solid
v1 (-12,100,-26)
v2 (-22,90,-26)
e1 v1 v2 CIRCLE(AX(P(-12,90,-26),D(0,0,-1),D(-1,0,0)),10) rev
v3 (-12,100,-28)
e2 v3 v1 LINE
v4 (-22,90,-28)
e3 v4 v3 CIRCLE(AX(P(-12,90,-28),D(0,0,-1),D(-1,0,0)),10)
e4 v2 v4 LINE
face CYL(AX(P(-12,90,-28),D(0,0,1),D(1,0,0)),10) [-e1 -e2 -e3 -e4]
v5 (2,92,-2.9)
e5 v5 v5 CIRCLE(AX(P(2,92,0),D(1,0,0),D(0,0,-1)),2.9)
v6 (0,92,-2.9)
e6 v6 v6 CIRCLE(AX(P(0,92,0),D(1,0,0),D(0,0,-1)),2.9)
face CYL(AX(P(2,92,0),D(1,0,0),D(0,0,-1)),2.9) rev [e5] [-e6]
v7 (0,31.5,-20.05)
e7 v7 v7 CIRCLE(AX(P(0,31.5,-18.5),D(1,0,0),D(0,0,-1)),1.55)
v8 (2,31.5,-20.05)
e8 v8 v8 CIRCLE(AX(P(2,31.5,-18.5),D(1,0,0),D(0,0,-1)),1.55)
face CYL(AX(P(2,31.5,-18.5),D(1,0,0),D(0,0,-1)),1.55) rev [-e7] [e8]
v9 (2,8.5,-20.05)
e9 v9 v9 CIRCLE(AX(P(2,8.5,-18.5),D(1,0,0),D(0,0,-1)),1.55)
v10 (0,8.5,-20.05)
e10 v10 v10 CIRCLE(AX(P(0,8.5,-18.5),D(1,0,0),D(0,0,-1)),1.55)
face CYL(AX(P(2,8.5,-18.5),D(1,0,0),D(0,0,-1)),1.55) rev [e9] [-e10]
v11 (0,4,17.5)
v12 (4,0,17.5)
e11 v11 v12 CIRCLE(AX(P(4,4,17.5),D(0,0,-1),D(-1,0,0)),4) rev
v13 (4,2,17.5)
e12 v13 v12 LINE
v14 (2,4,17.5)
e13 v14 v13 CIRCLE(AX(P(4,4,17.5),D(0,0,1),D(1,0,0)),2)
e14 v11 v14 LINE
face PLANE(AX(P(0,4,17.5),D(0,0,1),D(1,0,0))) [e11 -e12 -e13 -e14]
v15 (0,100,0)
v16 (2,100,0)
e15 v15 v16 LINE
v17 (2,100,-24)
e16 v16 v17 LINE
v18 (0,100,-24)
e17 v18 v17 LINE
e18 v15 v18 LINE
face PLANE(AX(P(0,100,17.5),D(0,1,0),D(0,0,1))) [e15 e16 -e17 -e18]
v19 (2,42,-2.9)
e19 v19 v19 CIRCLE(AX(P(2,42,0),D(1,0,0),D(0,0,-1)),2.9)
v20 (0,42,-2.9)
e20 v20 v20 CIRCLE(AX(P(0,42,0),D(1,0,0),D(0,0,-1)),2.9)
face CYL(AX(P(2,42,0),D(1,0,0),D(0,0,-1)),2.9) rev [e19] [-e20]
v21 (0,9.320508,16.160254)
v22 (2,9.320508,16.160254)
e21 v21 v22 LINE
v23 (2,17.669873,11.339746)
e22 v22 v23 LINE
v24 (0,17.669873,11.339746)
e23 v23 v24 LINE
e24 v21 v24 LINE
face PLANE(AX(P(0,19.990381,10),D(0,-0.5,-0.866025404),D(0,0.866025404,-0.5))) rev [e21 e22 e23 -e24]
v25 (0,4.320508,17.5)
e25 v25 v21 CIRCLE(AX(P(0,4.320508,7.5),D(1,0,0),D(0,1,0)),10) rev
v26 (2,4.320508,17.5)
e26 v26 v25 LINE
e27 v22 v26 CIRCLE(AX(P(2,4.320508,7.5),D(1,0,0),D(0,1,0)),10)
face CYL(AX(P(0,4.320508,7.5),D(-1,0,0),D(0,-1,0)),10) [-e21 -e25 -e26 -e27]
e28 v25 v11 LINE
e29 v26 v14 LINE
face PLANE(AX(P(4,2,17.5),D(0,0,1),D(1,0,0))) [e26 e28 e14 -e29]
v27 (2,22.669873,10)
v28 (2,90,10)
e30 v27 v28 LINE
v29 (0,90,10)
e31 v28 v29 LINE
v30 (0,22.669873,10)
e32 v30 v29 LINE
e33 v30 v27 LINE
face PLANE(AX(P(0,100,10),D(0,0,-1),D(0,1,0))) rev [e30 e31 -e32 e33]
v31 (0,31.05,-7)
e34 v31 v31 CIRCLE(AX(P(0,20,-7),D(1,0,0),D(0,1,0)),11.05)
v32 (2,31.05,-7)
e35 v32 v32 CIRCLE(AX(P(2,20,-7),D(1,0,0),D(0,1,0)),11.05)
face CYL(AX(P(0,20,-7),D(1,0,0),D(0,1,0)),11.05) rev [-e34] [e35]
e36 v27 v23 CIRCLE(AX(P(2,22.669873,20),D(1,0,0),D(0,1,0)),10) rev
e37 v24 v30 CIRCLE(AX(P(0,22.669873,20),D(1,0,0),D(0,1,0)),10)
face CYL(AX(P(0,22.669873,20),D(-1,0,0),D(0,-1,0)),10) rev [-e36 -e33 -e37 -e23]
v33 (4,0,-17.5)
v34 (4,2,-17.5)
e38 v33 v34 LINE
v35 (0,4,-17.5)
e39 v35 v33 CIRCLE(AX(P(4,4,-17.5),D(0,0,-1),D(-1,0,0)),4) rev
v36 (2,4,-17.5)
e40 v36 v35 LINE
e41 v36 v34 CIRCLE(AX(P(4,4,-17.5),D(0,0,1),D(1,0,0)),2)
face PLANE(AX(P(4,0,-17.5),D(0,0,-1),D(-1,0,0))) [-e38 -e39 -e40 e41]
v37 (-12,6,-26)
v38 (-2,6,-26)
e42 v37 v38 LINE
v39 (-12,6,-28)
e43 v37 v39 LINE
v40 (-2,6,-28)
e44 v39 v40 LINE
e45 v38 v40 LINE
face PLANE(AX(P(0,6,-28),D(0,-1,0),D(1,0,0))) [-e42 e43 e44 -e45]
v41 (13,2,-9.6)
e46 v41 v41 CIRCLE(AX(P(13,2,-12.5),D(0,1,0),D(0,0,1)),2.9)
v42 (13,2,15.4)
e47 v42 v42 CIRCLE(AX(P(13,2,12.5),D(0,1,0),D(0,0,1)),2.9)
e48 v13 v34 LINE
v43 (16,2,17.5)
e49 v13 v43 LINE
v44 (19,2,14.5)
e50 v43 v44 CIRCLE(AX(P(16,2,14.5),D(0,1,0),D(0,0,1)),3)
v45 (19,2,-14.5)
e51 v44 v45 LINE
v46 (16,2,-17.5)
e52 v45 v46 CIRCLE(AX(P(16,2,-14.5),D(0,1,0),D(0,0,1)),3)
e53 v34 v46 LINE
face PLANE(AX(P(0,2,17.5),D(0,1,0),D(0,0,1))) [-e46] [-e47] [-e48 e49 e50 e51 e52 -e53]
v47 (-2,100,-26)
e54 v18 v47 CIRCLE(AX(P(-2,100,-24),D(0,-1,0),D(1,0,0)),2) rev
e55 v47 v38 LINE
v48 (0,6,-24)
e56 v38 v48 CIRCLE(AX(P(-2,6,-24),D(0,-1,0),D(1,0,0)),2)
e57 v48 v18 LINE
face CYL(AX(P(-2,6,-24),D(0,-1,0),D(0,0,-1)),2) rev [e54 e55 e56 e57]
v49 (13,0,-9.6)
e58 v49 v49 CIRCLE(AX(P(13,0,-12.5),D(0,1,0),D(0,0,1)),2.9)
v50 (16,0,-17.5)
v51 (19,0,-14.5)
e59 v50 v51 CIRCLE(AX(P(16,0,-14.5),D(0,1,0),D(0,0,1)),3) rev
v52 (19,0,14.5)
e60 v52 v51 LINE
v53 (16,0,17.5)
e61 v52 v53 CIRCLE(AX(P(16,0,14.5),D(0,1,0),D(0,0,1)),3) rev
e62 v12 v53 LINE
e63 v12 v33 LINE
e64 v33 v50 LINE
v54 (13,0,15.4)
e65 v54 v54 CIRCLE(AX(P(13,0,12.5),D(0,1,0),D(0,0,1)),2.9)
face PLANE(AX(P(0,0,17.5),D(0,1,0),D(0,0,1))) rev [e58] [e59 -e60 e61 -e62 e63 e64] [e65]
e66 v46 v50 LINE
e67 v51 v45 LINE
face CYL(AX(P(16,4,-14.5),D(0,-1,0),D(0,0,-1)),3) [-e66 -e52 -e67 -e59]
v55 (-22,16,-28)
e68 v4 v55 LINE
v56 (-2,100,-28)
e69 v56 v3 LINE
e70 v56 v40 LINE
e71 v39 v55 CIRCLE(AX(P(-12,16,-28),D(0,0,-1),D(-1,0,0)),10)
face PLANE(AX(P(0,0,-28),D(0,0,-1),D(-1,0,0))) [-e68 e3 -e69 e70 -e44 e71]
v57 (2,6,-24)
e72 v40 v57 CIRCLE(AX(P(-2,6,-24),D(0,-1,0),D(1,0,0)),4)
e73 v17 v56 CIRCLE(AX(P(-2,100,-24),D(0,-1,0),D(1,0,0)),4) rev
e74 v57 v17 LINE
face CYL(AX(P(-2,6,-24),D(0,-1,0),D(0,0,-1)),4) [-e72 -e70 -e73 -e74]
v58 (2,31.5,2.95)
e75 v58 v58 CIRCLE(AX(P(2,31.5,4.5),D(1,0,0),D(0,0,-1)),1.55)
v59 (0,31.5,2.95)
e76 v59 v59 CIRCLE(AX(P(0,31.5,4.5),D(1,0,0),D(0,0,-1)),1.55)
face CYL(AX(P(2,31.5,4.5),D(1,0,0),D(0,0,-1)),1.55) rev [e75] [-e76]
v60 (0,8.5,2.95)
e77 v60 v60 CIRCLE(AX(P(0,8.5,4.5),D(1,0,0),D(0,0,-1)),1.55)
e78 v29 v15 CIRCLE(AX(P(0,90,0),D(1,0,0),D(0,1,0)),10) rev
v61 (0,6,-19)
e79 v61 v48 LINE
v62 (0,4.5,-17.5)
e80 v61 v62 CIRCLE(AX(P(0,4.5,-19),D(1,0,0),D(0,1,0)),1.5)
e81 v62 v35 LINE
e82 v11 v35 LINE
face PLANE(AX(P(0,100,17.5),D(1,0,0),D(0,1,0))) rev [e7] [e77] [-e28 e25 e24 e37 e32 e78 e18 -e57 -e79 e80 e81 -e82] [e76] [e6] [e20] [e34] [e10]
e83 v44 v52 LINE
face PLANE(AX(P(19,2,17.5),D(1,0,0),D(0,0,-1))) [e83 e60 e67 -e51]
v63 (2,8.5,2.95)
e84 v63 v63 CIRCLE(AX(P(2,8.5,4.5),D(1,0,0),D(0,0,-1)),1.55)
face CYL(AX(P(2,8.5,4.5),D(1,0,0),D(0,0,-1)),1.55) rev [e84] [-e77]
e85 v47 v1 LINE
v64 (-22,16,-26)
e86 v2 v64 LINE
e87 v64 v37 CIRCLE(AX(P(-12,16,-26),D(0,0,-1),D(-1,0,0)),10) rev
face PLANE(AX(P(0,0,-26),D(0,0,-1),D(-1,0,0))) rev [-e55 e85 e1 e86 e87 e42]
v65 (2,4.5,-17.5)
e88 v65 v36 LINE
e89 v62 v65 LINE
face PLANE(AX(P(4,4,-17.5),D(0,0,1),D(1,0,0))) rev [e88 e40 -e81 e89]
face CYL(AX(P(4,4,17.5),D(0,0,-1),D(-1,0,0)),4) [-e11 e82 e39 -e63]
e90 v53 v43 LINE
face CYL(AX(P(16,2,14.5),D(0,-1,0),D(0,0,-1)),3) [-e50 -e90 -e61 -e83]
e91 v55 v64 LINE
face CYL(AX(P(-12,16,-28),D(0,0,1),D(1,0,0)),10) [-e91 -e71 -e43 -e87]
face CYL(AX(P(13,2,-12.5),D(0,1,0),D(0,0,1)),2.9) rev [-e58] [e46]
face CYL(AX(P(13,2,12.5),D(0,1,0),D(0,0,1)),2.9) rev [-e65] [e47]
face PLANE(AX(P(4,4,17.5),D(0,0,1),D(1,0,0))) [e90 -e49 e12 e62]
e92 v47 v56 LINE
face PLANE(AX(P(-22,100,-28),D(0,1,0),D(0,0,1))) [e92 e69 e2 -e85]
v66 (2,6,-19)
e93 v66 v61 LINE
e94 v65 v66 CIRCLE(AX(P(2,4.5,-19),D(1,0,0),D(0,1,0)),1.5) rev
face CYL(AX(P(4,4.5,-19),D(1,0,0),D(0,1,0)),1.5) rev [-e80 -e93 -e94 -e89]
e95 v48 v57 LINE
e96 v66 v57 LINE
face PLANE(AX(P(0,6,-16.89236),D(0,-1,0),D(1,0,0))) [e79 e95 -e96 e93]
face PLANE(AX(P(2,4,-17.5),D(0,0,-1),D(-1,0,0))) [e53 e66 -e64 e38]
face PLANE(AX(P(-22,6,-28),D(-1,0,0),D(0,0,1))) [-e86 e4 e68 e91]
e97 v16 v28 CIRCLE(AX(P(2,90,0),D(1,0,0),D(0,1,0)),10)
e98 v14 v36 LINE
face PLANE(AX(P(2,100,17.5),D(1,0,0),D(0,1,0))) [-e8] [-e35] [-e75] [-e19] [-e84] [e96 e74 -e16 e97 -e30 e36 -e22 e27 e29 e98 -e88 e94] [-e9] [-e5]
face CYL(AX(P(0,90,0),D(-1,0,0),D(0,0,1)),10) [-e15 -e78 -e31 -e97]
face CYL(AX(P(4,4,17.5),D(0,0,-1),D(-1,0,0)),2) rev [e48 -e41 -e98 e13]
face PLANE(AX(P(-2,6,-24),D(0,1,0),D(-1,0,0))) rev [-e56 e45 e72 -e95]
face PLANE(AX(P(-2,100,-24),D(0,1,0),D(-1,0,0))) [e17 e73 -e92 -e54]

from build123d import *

# Parameters (mm, degrees)
BASE_FLANGE1_DEPTH     = 17.5
M5_CLEARANCE_HOLE2_D   = 5.8
M5_CLEARANCE_HOLE1_D   = 5.8
BOSS_EXTRUDE1_DEPTH    = 2
M2_5_CLEARANCE_HOLE1_D = 3.1
SKETCH13_R             = 11.05
CUT_EXTRUDE2_DEPTH     = 10
SKETCH16_W             = 3.5
SKETCH16_H             = 66
BOSS_EXTRUDE2_DEPTH    = 2
EDGE_FLANGE1_DEPTH     = 94
CUT_EXTRUDE3_DEPTH     = 2
FILLET1_R              = 10
FILLET2_R              = 3
FILLET3_R              = 1.5


# Sheet-metal steps are written as plain solids
with BuildPart() as part:
    # Sketch1 → Base-Flange1 (new, symmetric)
    with BuildSketch(Plane.XY):
        with BuildLine():
            Line((0, 100), (0, 4))
            ThreePointArc((0, 4), (1.171572875, 1.171572875), (4, 0))
            Line((4, 0), (19, 0))
            Line((19, 0), (19, 2))
            Line((19, 2), (4, 2))
            ThreePointArc((4, 2), (2.585786438, 2.585786438), (2, 4))
            Line((2, 4), (2, 100))
            Line((2, 100), (0, 100))
        make_face()
    extrude(amount=BASE_FLANGE1_DEPTH, both=True)

    # M5 Clearance Hole2 (through all)
    with Locations(Plane(origin=(0, 2, 0), x_dir=(1, 0, 0), z_dir=(0, 1, 0))):
        with Locations((13, -12.5), (13, 12.5)):
            Hole(M5_CLEARANCE_HOLE2_D / 2)

    # M5 Clearance Hole1 (through all)
    with Locations(Plane(origin=(2, 0, 0), x_dir=(0, 0, -1), z_dir=(1, 0, 0))):
        with Locations((0, 92), (0, 42)):
            Hole(M5_CLEARANCE_HOLE1_D / 2)

    # Sketch12 → Boss-Extrude1 (add)
    with BuildSketch(Plane(origin=(2, 0, 0), x_dir=(0, 0, -1), z_dir=(1, 0, 0))):
        Polygon((16.892359744, 6), (21, 6), (21, 34), (14.5, 34), align=None)
    extrude(amount=-BOSS_EXTRUDE1_DEPTH)

    # M2.5 Clearance Hole1 (through all)
    with Locations(Plane(origin=(2, 0, 0), x_dir=(0, 0, -1), z_dir=(1, 0, 0))):
        with Locations((18.5, 8.5), (-4.5, 8.5), (-4.5, 31.5), (18.5, 31.5)):
            Hole(M2_5_CLEARANCE_HOLE1_D / 2)

    # Sketch13 → Cut-Extrude2 (cut)
    with BuildSketch(Plane(origin=(2, 0, 0), x_dir=(0, 0, -1), z_dir=(1, 0, 0))):
        with Locations(Location((7, 20, 0), (0, 0, 90))):
            Circle(SKETCH13_R)
    extrude(amount=-CUT_EXTRUDE2_DEPTH, mode=Mode.SUBTRACT)

    # Sketch16 → Boss-Extrude2 (add)
    with BuildSketch(Plane(origin=(2, 0, 0), x_dir=(0, 0, -1), z_dir=(1, 0, 0))):
        with Locations((19.25, 67)):
            Rectangle(SKETCH16_W, SKETCH16_H)
    extrude(amount=-BOSS_EXTRUDE2_DEPTH)

    # Edge-Flange1 section (across the edge) → Edge-Flange1 (add)
    with BuildSketch(Plane(origin=(0, 100, -26), x_dir=(0, 0, 1), z_dir=(0, -1, 0))):
        with BuildLine():
            Line((-2, 2), (-2, 22))
            Line((-2, 22), (0, 22))
            Line((0, 22), (0, 2))
            ThreePointArc((0, 2), (0.585786438, 0.585786438), (2, 0))
            Line((2, 0), (5, 0))
            Line((5, 0), (5, -2))
            Line((5, -2), (2, -2))
            ThreePointArc((2, -2), (-0.828427125, -0.828427125), (-2, 2))
        make_face()
    extrude(amount=EDGE_FLANGE1_DEPTH)

    # Sketch20 → Cut-Extrude3 (cut)
    with BuildSketch(Plane(origin=(2, 0, 0), x_dir=(0, 0, -1), z_dir=(1, 0, 0))):
        Polygon((-10, 100), (-10, 19.990381057), (-17.5, 7), (-17.5, 100), align=None)
    extrude(amount=-CUT_EXTRUDE3_DEPTH, mode=Mode.SUBTRACT)

    # Fillet1
    fillet1_edges = [part.edges().sort_by_distance(p)[0] for p in [
        (-22, 100, -27),
        (-22, 6, -27),
        (1, 100, 10),
        (1, 19.990381057, 10),
        (1, 7, 17.5),
    ]]
    fillet(fillet1_edges, radius=FILLET1_R)

    # Fillet2
    fillet2_edges = [part.edges().sort_by_distance(p)[0] for p in [
        (19, 1, 17.5),
        (19, 1, -17.5),
    ]]
    fillet(fillet2_edges, radius=FILLET2_R)

    # Fillet3
    fillet3_edges = [part.edges().sort_by_distance(p)[0] for p in [
        (1, 6, -17.5),
    ]]
    fillet(fillet3_edges, radius=FILLET3_R)


solid = part.part
